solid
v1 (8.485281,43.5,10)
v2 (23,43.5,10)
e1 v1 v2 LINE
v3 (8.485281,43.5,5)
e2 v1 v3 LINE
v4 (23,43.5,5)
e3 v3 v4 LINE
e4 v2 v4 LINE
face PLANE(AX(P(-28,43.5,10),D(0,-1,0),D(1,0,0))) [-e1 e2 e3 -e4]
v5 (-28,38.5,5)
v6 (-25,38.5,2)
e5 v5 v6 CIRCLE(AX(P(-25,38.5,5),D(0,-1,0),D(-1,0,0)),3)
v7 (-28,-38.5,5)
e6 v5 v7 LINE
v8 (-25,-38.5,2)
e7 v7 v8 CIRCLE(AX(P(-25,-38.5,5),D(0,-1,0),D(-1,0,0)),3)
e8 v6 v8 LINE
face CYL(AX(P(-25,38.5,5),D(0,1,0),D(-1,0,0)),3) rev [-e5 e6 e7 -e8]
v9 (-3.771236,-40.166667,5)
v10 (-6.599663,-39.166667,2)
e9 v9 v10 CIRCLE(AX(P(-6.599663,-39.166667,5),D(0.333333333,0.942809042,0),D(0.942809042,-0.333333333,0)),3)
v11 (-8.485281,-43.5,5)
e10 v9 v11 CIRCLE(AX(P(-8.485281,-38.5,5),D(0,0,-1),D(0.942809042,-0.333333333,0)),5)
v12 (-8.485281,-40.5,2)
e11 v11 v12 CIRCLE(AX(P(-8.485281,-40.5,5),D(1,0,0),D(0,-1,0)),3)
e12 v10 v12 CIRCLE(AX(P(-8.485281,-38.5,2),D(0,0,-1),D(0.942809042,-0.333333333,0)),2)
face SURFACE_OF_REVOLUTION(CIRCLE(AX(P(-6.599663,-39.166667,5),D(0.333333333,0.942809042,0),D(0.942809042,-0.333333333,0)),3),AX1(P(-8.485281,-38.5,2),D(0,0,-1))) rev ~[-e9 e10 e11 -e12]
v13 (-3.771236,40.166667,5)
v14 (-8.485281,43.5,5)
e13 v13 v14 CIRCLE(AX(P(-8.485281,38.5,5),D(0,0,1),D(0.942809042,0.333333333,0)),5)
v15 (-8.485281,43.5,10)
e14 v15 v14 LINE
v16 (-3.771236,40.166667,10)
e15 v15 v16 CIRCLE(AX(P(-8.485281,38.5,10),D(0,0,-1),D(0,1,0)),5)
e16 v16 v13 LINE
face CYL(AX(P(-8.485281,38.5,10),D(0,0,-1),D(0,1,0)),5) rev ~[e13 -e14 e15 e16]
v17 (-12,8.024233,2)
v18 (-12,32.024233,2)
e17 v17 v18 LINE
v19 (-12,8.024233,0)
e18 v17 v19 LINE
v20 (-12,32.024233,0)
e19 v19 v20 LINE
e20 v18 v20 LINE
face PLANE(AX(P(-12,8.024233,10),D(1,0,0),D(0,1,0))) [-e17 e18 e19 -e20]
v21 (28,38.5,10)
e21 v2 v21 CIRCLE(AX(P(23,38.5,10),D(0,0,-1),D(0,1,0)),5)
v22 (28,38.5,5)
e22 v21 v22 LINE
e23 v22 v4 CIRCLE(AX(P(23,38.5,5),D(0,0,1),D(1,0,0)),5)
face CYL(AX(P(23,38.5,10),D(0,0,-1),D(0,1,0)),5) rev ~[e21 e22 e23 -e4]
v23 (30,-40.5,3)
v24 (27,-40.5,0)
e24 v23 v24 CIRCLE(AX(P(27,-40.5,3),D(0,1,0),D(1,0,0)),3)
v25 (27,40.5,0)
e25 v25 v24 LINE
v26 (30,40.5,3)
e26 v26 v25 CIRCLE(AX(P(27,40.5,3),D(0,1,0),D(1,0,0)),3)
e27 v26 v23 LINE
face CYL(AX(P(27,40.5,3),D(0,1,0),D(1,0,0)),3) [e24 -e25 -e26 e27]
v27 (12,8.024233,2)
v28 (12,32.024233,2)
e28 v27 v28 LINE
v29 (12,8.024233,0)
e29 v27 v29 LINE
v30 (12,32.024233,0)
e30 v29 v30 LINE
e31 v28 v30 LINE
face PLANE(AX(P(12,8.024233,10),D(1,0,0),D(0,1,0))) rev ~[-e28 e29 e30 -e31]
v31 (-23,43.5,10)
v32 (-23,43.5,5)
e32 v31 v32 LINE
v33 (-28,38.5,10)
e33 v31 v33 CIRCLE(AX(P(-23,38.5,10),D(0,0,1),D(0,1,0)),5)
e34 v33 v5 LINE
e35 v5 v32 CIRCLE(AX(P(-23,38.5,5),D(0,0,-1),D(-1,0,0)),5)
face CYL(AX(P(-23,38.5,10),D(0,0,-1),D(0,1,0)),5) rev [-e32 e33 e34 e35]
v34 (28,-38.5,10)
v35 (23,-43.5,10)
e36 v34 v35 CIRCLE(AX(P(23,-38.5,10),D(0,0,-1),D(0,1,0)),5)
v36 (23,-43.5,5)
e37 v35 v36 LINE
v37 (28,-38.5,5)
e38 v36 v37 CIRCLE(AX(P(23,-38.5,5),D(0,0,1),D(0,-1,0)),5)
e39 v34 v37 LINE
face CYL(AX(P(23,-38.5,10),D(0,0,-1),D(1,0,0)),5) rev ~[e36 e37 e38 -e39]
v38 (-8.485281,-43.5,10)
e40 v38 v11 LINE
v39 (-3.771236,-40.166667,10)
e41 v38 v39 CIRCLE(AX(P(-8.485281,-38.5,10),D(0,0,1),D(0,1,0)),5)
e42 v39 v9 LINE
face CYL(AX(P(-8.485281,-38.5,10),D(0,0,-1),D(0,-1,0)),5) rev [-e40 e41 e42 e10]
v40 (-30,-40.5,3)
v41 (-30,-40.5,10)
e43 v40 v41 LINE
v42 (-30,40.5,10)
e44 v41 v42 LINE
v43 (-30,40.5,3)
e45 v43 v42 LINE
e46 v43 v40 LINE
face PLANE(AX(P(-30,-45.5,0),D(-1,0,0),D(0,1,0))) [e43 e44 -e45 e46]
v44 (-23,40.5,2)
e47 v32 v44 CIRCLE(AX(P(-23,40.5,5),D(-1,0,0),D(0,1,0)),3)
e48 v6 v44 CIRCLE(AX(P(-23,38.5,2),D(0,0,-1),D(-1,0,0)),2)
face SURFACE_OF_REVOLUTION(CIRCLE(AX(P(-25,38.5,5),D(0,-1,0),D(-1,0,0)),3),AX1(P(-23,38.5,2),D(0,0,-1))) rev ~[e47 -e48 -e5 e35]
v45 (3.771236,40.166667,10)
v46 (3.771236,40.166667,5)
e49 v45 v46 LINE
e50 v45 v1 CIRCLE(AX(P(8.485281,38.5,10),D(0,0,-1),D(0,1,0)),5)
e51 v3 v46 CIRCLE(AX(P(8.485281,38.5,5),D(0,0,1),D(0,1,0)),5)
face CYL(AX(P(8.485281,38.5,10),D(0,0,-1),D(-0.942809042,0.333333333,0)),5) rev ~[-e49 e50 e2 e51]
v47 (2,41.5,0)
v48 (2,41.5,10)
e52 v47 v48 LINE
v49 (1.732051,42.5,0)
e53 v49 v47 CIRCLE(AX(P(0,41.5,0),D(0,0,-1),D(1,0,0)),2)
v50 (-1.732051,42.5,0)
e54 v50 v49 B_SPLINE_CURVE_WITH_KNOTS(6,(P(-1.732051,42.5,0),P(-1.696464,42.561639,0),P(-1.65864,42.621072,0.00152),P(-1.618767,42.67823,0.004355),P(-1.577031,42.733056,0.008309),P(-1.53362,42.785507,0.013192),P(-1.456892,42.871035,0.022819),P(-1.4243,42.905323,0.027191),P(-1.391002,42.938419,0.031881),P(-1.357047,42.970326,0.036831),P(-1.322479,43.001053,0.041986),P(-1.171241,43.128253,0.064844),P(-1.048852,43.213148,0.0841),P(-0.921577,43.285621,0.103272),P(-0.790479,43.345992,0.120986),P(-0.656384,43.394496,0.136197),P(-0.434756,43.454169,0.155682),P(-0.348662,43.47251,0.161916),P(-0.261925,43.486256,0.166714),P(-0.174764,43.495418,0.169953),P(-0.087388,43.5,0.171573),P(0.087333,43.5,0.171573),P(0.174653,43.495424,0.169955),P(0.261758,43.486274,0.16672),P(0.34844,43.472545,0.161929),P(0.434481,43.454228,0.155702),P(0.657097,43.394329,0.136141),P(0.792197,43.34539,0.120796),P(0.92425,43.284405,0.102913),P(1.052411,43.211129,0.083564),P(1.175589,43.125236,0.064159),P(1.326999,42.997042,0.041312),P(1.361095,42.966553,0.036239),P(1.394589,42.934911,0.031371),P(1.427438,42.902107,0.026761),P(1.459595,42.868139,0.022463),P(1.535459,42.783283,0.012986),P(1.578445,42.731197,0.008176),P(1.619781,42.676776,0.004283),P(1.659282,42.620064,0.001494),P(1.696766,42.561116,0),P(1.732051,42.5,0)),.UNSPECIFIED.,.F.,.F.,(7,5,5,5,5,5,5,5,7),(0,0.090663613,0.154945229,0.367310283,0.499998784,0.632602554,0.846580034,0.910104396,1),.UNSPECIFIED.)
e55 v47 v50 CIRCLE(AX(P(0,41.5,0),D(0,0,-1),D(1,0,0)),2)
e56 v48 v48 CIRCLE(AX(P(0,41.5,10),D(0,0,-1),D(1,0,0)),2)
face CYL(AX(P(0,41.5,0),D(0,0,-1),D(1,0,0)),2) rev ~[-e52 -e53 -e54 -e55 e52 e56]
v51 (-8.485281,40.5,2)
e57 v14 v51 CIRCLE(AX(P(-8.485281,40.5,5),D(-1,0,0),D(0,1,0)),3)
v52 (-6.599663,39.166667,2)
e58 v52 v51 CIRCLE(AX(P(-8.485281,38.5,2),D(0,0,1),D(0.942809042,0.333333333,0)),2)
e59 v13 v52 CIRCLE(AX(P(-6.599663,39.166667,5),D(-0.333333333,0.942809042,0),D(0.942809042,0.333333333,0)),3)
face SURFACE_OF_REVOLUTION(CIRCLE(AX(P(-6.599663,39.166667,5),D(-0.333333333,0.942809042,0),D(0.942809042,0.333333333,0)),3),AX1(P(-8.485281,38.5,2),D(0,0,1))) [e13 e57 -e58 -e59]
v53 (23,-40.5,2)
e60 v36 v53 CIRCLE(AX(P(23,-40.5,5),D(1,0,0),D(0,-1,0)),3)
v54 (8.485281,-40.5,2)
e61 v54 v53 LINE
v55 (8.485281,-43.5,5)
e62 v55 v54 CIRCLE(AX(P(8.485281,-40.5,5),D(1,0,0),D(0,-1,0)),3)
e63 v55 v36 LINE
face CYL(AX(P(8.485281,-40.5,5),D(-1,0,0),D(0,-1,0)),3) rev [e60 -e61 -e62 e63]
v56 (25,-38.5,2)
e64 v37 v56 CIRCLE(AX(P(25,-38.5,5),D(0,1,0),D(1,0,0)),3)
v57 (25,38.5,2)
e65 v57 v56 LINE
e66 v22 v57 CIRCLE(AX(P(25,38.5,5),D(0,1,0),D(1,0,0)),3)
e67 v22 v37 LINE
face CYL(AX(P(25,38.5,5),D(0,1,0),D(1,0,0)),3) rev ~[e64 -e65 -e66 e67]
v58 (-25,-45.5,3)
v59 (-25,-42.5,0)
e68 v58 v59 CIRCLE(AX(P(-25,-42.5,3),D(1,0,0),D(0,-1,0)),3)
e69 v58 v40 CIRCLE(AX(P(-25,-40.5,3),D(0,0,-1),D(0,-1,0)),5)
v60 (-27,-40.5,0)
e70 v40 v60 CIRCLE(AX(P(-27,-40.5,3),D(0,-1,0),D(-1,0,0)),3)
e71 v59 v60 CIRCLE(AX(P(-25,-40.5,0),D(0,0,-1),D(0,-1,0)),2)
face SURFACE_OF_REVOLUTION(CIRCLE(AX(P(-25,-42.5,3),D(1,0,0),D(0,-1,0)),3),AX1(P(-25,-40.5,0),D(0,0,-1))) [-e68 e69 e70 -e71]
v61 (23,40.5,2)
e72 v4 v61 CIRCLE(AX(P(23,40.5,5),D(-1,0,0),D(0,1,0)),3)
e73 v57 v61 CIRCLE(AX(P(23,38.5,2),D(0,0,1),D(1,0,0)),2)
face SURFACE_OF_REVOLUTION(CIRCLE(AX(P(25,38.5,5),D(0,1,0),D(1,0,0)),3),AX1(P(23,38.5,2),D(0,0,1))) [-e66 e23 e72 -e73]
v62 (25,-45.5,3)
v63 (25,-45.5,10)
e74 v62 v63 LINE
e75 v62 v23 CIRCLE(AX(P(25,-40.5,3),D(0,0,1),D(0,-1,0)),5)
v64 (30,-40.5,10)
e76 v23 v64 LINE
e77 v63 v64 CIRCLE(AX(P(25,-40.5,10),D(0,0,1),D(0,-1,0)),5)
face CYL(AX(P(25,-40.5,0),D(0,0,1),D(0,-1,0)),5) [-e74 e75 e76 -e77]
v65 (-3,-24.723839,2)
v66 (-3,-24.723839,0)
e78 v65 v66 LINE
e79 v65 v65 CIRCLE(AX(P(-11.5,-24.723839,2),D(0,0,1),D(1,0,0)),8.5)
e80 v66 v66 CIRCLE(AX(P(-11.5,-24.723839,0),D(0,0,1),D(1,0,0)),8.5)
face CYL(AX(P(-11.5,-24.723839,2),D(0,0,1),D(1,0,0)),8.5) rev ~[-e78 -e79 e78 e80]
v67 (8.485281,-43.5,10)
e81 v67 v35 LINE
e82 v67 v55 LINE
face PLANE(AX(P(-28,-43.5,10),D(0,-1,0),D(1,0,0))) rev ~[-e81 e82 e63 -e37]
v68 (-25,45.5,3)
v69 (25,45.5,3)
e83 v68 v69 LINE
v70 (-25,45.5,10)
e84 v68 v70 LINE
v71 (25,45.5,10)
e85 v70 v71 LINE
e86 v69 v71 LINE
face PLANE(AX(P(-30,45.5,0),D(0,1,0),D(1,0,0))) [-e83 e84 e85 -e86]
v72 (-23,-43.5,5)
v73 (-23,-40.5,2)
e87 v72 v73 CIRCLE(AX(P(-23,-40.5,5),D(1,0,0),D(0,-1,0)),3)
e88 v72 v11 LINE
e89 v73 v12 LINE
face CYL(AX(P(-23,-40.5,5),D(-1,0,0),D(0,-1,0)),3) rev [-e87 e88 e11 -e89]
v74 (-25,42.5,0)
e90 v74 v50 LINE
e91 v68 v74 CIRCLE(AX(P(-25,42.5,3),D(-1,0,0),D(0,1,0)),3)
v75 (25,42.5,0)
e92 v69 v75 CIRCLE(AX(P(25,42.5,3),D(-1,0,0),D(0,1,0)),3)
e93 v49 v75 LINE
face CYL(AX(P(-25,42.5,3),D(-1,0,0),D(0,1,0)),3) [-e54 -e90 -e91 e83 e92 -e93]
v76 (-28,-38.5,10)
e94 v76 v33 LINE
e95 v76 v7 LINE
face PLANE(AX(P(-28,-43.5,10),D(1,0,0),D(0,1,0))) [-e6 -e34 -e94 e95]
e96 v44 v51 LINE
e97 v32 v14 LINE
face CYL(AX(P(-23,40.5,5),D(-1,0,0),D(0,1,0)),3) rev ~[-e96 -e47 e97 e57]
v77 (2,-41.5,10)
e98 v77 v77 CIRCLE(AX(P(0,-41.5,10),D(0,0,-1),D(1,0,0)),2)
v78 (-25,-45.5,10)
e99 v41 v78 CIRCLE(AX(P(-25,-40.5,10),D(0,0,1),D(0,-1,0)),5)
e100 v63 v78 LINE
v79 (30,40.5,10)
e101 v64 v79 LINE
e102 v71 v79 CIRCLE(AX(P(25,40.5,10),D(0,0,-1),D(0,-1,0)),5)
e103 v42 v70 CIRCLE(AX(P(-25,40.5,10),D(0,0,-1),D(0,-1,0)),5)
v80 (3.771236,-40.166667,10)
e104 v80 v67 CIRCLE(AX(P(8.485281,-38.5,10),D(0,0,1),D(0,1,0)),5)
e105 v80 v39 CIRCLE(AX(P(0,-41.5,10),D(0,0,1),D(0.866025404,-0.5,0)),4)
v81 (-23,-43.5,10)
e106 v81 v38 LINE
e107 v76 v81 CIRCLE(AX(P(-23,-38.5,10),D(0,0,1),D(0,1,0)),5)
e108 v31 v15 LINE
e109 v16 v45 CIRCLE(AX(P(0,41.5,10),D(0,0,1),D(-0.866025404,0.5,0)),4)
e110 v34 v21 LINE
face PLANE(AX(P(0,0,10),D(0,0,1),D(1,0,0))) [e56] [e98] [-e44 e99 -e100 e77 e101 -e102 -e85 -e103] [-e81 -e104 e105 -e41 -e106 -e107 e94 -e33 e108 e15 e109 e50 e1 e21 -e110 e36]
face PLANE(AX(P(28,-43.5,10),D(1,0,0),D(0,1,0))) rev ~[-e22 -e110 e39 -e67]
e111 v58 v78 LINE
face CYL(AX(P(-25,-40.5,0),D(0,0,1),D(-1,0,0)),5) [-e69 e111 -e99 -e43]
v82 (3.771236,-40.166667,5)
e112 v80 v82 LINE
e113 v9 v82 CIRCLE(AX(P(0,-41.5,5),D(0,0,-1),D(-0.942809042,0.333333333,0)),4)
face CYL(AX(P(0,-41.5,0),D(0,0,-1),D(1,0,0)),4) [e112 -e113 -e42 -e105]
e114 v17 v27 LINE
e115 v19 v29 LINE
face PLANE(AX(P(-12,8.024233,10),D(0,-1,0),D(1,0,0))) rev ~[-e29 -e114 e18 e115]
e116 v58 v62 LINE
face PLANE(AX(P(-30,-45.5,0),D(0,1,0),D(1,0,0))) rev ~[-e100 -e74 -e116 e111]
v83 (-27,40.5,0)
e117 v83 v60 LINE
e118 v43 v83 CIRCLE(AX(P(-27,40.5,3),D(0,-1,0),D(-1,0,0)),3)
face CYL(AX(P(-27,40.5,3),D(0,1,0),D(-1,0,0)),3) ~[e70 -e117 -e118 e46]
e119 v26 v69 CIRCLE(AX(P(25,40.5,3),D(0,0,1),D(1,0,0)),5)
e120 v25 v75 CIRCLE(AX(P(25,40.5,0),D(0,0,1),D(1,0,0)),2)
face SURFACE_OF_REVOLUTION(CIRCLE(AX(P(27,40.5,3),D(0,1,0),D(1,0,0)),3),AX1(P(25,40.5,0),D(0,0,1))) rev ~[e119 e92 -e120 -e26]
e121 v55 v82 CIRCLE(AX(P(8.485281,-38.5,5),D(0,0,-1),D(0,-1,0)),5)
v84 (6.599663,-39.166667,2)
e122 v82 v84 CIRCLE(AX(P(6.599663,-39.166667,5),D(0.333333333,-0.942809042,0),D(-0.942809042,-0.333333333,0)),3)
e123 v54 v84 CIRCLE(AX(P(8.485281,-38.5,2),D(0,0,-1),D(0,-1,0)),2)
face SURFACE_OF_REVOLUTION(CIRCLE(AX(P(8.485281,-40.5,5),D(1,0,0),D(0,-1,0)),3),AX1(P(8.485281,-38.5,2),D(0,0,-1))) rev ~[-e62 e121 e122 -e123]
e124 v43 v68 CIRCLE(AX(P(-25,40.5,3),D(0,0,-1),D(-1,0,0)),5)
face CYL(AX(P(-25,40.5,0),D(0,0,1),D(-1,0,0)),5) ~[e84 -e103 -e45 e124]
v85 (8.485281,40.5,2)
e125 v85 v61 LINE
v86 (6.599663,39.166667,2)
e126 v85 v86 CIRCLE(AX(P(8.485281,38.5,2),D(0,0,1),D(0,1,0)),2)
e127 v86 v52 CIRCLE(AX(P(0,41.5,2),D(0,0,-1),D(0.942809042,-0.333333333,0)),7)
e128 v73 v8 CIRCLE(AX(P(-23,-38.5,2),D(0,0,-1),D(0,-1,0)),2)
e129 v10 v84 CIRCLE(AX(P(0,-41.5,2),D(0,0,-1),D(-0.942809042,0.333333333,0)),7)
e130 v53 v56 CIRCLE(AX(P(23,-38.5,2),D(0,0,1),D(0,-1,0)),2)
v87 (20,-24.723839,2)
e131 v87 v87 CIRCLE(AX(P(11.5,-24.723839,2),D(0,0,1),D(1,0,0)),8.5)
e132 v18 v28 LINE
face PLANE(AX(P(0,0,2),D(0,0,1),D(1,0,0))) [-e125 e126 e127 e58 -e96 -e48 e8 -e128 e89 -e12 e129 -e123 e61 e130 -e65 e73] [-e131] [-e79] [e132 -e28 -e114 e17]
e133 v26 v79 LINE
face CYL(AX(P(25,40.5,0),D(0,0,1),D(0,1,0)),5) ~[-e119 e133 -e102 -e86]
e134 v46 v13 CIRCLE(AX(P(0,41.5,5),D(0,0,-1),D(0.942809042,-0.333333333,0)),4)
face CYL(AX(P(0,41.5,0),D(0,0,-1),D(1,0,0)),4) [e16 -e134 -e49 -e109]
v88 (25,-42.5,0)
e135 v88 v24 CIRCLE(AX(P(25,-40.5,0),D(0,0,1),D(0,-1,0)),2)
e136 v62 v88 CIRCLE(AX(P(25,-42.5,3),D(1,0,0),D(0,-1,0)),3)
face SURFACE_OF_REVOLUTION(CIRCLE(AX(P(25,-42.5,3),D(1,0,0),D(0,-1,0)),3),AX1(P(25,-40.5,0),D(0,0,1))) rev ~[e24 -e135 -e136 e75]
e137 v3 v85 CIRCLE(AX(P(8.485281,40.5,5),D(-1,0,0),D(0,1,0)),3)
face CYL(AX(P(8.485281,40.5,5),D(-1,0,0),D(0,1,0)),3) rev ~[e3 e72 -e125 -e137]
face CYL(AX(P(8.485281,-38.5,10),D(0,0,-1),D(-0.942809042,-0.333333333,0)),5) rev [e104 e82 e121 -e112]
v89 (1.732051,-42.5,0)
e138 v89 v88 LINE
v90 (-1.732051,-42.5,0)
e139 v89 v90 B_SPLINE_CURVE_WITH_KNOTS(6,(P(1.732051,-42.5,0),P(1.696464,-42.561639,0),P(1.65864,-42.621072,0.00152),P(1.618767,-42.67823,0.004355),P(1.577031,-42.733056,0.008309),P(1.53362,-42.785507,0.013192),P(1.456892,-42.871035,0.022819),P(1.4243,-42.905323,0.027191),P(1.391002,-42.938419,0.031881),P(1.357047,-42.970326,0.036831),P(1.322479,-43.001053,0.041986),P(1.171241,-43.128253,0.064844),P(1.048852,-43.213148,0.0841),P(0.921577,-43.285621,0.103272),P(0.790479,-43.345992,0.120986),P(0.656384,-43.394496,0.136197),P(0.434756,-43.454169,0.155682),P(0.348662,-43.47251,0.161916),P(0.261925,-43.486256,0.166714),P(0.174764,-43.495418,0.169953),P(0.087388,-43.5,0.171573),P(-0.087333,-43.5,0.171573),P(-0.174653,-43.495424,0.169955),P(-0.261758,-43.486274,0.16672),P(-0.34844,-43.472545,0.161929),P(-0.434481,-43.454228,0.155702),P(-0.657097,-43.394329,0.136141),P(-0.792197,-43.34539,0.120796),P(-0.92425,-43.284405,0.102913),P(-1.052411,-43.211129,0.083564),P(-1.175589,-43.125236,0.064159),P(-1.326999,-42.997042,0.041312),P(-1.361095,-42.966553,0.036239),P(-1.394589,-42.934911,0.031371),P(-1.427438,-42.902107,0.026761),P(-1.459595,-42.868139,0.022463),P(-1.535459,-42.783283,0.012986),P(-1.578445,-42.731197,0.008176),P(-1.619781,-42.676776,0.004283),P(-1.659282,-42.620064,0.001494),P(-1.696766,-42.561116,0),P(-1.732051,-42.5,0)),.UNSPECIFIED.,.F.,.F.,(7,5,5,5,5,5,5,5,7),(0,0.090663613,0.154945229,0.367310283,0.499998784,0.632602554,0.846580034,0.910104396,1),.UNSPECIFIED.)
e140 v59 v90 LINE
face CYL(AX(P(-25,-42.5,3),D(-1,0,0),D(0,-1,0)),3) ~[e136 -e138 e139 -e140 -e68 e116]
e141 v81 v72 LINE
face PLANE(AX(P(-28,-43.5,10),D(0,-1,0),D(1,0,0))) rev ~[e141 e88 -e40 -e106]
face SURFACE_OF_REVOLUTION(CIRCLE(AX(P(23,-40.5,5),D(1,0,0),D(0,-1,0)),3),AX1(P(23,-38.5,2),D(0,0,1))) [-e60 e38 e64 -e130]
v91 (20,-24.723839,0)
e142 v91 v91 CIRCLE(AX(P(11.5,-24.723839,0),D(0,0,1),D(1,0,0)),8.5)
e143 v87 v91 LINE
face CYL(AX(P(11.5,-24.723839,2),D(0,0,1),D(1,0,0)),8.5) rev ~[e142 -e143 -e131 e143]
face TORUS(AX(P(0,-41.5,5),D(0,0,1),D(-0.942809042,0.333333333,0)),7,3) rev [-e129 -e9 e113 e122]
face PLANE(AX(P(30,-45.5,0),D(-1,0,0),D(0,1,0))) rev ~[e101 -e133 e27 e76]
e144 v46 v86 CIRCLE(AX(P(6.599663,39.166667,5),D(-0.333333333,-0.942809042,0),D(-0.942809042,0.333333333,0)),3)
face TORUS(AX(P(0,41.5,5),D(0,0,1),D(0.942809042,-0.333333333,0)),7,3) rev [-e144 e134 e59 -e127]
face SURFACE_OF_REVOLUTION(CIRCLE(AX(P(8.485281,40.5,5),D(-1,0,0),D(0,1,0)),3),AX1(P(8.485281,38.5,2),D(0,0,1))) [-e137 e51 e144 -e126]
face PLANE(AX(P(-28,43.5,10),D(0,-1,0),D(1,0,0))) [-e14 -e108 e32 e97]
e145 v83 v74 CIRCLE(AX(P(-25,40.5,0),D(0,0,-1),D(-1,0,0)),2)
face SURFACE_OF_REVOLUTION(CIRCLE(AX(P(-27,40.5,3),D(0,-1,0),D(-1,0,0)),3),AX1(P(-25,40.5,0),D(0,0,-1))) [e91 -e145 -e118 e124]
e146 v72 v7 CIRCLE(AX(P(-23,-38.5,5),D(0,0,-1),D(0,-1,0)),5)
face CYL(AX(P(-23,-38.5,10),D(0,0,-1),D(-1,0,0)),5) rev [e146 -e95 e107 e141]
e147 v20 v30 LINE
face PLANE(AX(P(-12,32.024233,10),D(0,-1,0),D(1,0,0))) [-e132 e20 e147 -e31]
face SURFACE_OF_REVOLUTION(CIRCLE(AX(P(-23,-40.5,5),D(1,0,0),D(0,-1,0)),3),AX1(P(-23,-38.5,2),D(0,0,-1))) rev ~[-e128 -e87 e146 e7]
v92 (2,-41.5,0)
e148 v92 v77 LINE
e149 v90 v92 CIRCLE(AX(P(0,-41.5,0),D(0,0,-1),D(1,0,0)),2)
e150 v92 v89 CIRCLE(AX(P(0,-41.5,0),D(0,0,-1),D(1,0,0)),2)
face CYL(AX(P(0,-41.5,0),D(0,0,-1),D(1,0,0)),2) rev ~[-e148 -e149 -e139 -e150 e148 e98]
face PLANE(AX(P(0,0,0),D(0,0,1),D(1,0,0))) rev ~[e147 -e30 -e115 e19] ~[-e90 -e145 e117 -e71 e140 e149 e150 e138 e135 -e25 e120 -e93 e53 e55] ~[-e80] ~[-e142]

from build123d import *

# Parameters (mm, degrees)
F3_W          = 60
F3_H          = 91
F4_DEPTH      = 10
F5_W          = 56
F5_H          = 87
F5_W_2        = 24
F5_H_2        = 24
F6_DEPTH      = 8
F7_R          = 4
F8_DEPTH      = 10
F9_R          = 2
F10_DEPTH     = 10.001
F11_R         = 5
F12_R         = 5
F13_T1_DEPTH  = 77
F13_T3_DEPTH  = 14.5147186258
F13_T5_DEPTH  = 14.5147186258
F13_T8_ANGLE  = 90
F13_T10_ANGLE = 70.5287793655
F13_T12_ANGLE = 141.057558731
F13_T14_ANGLE = 90
F13_T16_ANGLE = 70.5287793655
F13_T18_ANGLE = 70.5287793655
F13_T20_ANGLE = 90
F13_T22_ANGLE = 141.057558731
F13_T24_ANGLE = 70.5287793655
F13_T26_ANGLE = 90
F13_T27_DEPTH = 81
F13_T29_DEPTH = 50
F13_T32_ANGLE = 90
F13_T34_ANGLE = 90
F13_T36_ANGLE = 90
F13_T38_ANGLE = 90
F14_R         = 8.5
F15_DEPTH     = 2.0010001
F16_DEPTH     = 10.0010001


# Not quite as in the source:
# - a fillet or chamfer that OpenCascade refuses, or shapes differently, is made with other operations: its cross-section is extruded or revolved along the edge and cut away or added


with BuildPart() as f4:
    # F3 (on Top) → F4 (new body)
    with BuildSketch(Plane.XY):
        Rectangle(F3_W, F3_H)
    extrude(amount=F4_DEPTH)

    # F5 (on face) → F6 (cut)
    with BuildSketch(Plane.XY.offset(10)):
        Rectangle(F5_W, F5_H)
        with Locations((0, 20.0242325664)):
            Rectangle(F5_W_2, F5_H_2, mode=Mode.SUBTRACT)
    extrude(amount=-F6_DEPTH, mode=Mode.SUBTRACT)

    # F7 (on face) → F8 (join)
    with BuildSketch(Plane(origin=(0, 0, 0), x_dir=(1, 0, 0), z_dir=(0, 0, -1))):
        with Locations((0, -41.5)):
            Circle(F7_R)
        with Locations((0, 41.5)):
            Circle(F7_R)
    extrude(amount=-F8_DEPTH)

    # F9 (on face) → F10 (cut, through all)
    with BuildSketch(Plane(origin=(0, 0, 0), x_dir=(1, 0, 0), z_dir=(0, 0, -1))):
        with Locations((0, -41.5)):
            Circle(F9_R)
        with Locations((0, 41.5)):
            Circle(F9_R)
    extrude(amount=-F10_DEPTH, mode=Mode.SUBTRACT)

    # F11
    f11_edges = [f4.edges().sort_by_distance(p)[0] for p in [
        (3.464102, 43.5, 6),
        (-3.464102, 43.5, 6),
        (-3.464102, -43.5, 6),
        (3.464102, -43.5, 6),
    ]]
    fillet(f11_edges, radius=F11_R)

    # F12
    f12_edges = [f4.edges().sort_by_distance(p)[0] for p in [
        (30, -45.5, 5),
        (-30, -45.5, 5),
        (30, 45.5, 5),
        (-30, 45.5, 5),
        (28, -43.5, 6),
        (-28, -43.5, 6),
        (-28, 43.5, 6),
        (28, 43.5, 6),
    ]]
    fillet(f12_edges, radius=F12_R)

    # F13: fillet of radius 3 on 24 edges, made by hand

    # F13_s2 → F13_t1 (join)
    with BuildSketch(Plane.XZ.offset(-38.5)):
        with BuildLine():
            ThreePointArc((-28, 5), (-27.1213203436, 2.8786796564), (-25, 2))
            Line((-25, 2), (-28, 2))
            Line((-28, 2), (-28, 5))
        make_face()
        with BuildLine():
            ThreePointArc((28, 5), (27.1213203436, 2.8786796564), (25, 2))
            Line((25, 2), (28, 2))
            Line((28, 2), (28, 5))
        make_face()
    extrude(amount=F13_T1_DEPTH)

    # F13_s4 → F13_t3 (join)
    with BuildSketch(Plane.YZ.offset(8.4852813742)):
        with BuildLine():
            ThreePointArc((-43.5, 5), (-42.6213203436, 2.8786796564), (-40.5, 2))
            Line((-40.5, 2), (-43.5, 2))
            Line((-43.5, 2), (-43.5, 5))
        make_face()
        with BuildLine():
            ThreePointArc((43.5, 5), (42.6213203436, 2.8786796564), (40.5, 2))
            Line((40.5, 2), (43.5, 2))
            Line((43.5, 2), (43.5, 5))
        make_face()
    extrude(amount=F13_T3_DEPTH)

    # F13_s6 → F13_t5 (join)
    with BuildSketch(Plane.YZ.offset(-23)):
        with BuildLine():
            ThreePointArc((-43.5, 5), (-42.6213203436, 2.8786796564), (-40.5, 2))
            Line((-40.5, 2), (-43.5, 2))
            Line((-43.5, 2), (-43.5, 5))
        make_face()
        with BuildLine():
            ThreePointArc((43.5, 5), (42.6213203436, 2.8786796564), (40.5, 2))
            Line((40.5, 2), (43.5, 2))
            Line((43.5, 2), (43.5, 5))
        make_face()
    extrude(amount=F13_T5_DEPTH)

    # F13_s7 → F13_t8 (revolve)
    with BuildSketch(Plane.YZ.offset(23)):
        with BuildLine():
            ThreePointArc((-43.5, 5), (-42.6213203436, 2.8786796564), (-40.5, 2))
            Line((-40.5, 2), (-43.5, 2))
            Line((-43.5, 2), (-43.5, 5))
        make_face()
    revolve(axis=Axis((23, -38.5, 2), (0, 0, 1)), revolution_arc=F13_T8_ANGLE)

    # F13_s9 → F13_t10 (revolve)
    with BuildSketch(Plane.YZ.offset(8.4852813742)):
        with BuildLine():
            ThreePointArc((-43.5, 5), (-42.6213203436, 2.8786796564), (-40.5, 2))
            Line((-40.5, 2), (-43.5, 2))
            Line((-43.5, 2), (-43.5, 5))
        make_face()
    revolve(axis=Axis((8.4852813742, -38.5, 2), (0, 0, -1)), revolution_arc=F13_T10_ANGLE)

    # F13_s11 → F13_t12 (revolve)
    with BuildSketch(Plane(origin=(-13.0421917419, -36.8888888889, 0), x_dir=(0, 0, 1), z_dir=(-0.3333333333, -0.9428090416, 0))):
        with BuildLine():
            ThreePointArc((5, -9.8333333333), (2.8786796564, -8.9546536769), (2, -6.8333333333))
            Line((2, -6.8333333333), (2, -9.8333333333))
            Line((2, -9.8333333333), (5, -9.8333333333))
        make_face()
    revolve(axis=Axis((0, -41.5, 2), (0, 0, -1)), revolution_arc=F13_T12_ANGLE)

    # F13_s13 → F13_t14 (revolve)
    with BuildSketch(Plane.XZ.offset(-38.5)):
        with BuildLine():
            ThreePointArc((28, 5), (27.1213203436, 2.8786796564), (25, 2))
            Line((25, 2), (28, 2))
            Line((28, 2), (28, 5))
        make_face()
    revolve(axis=Axis((23, 38.5, 2), (0, 0, 1)), revolution_arc=F13_T14_ANGLE)

    # F13_s15 → F13_t16 (revolve)
    with BuildSketch(Plane(origin=(-13.0421917419, -36.8888888889, 0), x_dir=(0, 0, 1), z_dir=(0.3333333333, 0.9428090416, 0))):
        with BuildLine():
            ThreePointArc((5, 9.8333333333), (2.8786796564, 8.9546536769), (2, 6.8333333333))
            Line((2, 6.8333333333), (2, 9.8333333333))
            Line((2, 9.8333333333), (5, 9.8333333333))
        make_face()
    revolve(axis=Axis((-8.4852813742, -38.5, 2), (0, 0, -1)), revolution_arc=F13_T16_ANGLE)

    # F13_s17 → F13_t18 (revolve)
    with BuildSketch(Plane.YZ.offset(8.4852813742)):
        with BuildLine():
            ThreePointArc((43.5, 5), (42.6213203436, 2.8786796564), (40.5, 2))
            Line((40.5, 2), (43.5, 2))
            Line((43.5, 2), (43.5, 5))
        make_face()
    revolve(axis=Axis((8.4852813742, 38.5, 2), (0, 0, 1)), revolution_arc=F13_T18_ANGLE)

    # F13_s19 → F13_t20 (revolve)
    with BuildSketch(Plane.YZ.offset(-23)):
        with BuildLine():
            ThreePointArc((-43.5, 5), (-42.6213203436, 2.8786796564), (-40.5, 2))
            Line((-40.5, 2), (-43.5, 2))
            Line((-43.5, 2), (-43.5, 5))
        make_face()
    revolve(axis=Axis((-23, -38.5, 2), (0, 0, -1)), revolution_arc=F13_T20_ANGLE)

    # F13_s21 → F13_t22 (revolve)
    with BuildSketch(Plane(origin=(13.0421917419, 36.8888888889, 0), x_dir=(0, 0, 1), z_dir=(0.3333333333, 0.9428090416, 0))):
        with BuildLine():
            ThreePointArc((5, -9.8333333333), (2.8786796564, -8.9546536769), (2, -6.8333333333))
            Line((2, -6.8333333333), (2, -9.8333333333))
            Line((2, -9.8333333333), (5, -9.8333333333))
        make_face()
    revolve(axis=Axis((0, 41.5, 2), (0, 0, -1)), revolution_arc=F13_T22_ANGLE)

    # F13_s23 → F13_t24 (revolve)
    with BuildSketch(Plane(origin=(-13.0421917419, 36.8888888889, 0), x_dir=(0, 0, 1), z_dir=(0.3333333333, -0.9428090416, 0))):
        with BuildLine():
            ThreePointArc((5, -9.8333333333), (2.8786796564, -8.9546536769), (2, -6.8333333333))
            Line((2, -6.8333333333), (2, -9.8333333333))
            Line((2, -9.8333333333), (5, -9.8333333333))
        make_face()
    revolve(axis=Axis((-8.4852813742, 38.5, 2), (0, 0, 1)), revolution_arc=F13_T24_ANGLE)

    # F13_s25 → F13_t26 (revolve)
    with BuildSketch(Plane.XZ.offset(-38.5)):
        with BuildLine():
            ThreePointArc((-28, 5), (-27.1213203436, 2.8786796564), (-25, 2))
            Line((-25, 2), (-28, 2))
            Line((-28, 2), (-28, 5))
        make_face()
    revolve(axis=Axis((-23, 38.5, 2), (0, 0, -1)), revolution_arc=F13_T26_ANGLE)

    # F13_s28 → F13_t27 (cut)
    with BuildSketch(Plane.XZ.offset(-40.5)):
        with BuildLine():
            ThreePointArc((30, 3), (29.1213203436, 0.8786796564), (27, 0))
            Line((27, 0), (30, 0))
            Line((30, 0), (30, 3))
        make_face()
        with BuildLine():
            ThreePointArc((-30, 3), (-29.1213203436, 0.8786796564), (-27, 0))
            Line((-27, 0), (-30, 0))
            Line((-30, 0), (-30, 3))
        make_face()
    extrude(amount=F13_T27_DEPTH, mode=Mode.SUBTRACT)

    # F13_s30 → F13_t29 (cut)
    with BuildSketch(Plane.YZ.offset(-25)):
        with BuildLine():
            ThreePointArc((-45.5, 3), (-44.6213203436, 0.8786796564), (-42.5, 0))
            Line((-42.5, 0), (-45.5, 0))
            Line((-45.5, 0), (-45.5, 3))
        make_face()
        with BuildLine():
            ThreePointArc((45.5, 3), (44.6213203436, 0.8786796564), (42.5, 0))
            Line((42.5, 0), (45.5, 0))
            Line((45.5, 0), (45.5, 3))
        make_face()
    extrude(amount=F13_T29_DEPTH, mode=Mode.SUBTRACT)

    # F13_s31 → F13_t32 (revolve, cut)
    with BuildSketch(Plane.YZ.offset(25)):
        with BuildLine():
            ThreePointArc((-45.5, 3), (-44.6213203436, 0.8786796564), (-42.5, 0))
            Line((-42.5, 0), (-45.5, 0))
            Line((-45.5, 0), (-45.5, 3))
        make_face()
    revolve(axis=Axis((25, -40.5, 0), (0, 0, 1)), revolution_arc=F13_T32_ANGLE, mode=Mode.SUBTRACT)

    # F13_s33 → F13_t34 (revolve, cut)
    with BuildSketch(Plane.YZ.offset(-25)):
        with BuildLine():
            ThreePointArc((-45.5, 3), (-44.6213203436, 0.8786796564), (-42.5, 0))
            Line((-42.5, 0), (-45.5, 0))
            Line((-45.5, 0), (-45.5, 3))
        make_face()
    revolve(axis=Axis((-25, -40.5, 0), (0, 0, -1)), revolution_arc=F13_T34_ANGLE, mode=Mode.SUBTRACT)

    # F13_s35 → F13_t36 (revolve, cut)
    with BuildSketch(Plane.XZ.offset(-40.5)):
        with BuildLine():
            ThreePointArc((30, 3), (29.1213203436, 0.8786796564), (27, 0))
            Line((27, 0), (30, 0))
            Line((30, 0), (30, 3))
        make_face()
    revolve(axis=Axis((25, 40.5, 0), (0, 0, 1)), revolution_arc=F13_T36_ANGLE, mode=Mode.SUBTRACT)

    # F13_s37 → F13_t38 (revolve, cut)
    with BuildSketch(Plane.XZ.offset(-40.5)):
        with BuildLine():
            ThreePointArc((-30, 3), (-29.1213203436, 0.8786796564), (-27, 0))
            Line((-27, 0), (-30, 0))
            Line((-30, 0), (-30, 3))
        make_face()
    revolve(axis=Axis((-25, 40.5, 0), (0, 0, -1)), revolution_arc=F13_T38_ANGLE, mode=Mode.SUBTRACT)

    # F14 (on face) → F15 (cut, through all)
    with BuildSketch(Plane.XY.offset(2)):
        with Locations((11.5, -24.7238390148)):
            Circle(F14_R)
        with Locations((-11.5, -24.7238390148)):
            Circle(F14_R)
    extrude(amount=-F15_DEPTH, mode=Mode.SUBTRACT)

    # F16 (cut, through all): a face of the model
    f16_faces = [f4.faces().sort_by_distance(p)[0] for p in [
        (0, 20.0242325664, 10),
    ]]
    extrude(f16_faces, amount=-F16_DEPTH, mode=Mode.SUBTRACT)


solid = f4.part
